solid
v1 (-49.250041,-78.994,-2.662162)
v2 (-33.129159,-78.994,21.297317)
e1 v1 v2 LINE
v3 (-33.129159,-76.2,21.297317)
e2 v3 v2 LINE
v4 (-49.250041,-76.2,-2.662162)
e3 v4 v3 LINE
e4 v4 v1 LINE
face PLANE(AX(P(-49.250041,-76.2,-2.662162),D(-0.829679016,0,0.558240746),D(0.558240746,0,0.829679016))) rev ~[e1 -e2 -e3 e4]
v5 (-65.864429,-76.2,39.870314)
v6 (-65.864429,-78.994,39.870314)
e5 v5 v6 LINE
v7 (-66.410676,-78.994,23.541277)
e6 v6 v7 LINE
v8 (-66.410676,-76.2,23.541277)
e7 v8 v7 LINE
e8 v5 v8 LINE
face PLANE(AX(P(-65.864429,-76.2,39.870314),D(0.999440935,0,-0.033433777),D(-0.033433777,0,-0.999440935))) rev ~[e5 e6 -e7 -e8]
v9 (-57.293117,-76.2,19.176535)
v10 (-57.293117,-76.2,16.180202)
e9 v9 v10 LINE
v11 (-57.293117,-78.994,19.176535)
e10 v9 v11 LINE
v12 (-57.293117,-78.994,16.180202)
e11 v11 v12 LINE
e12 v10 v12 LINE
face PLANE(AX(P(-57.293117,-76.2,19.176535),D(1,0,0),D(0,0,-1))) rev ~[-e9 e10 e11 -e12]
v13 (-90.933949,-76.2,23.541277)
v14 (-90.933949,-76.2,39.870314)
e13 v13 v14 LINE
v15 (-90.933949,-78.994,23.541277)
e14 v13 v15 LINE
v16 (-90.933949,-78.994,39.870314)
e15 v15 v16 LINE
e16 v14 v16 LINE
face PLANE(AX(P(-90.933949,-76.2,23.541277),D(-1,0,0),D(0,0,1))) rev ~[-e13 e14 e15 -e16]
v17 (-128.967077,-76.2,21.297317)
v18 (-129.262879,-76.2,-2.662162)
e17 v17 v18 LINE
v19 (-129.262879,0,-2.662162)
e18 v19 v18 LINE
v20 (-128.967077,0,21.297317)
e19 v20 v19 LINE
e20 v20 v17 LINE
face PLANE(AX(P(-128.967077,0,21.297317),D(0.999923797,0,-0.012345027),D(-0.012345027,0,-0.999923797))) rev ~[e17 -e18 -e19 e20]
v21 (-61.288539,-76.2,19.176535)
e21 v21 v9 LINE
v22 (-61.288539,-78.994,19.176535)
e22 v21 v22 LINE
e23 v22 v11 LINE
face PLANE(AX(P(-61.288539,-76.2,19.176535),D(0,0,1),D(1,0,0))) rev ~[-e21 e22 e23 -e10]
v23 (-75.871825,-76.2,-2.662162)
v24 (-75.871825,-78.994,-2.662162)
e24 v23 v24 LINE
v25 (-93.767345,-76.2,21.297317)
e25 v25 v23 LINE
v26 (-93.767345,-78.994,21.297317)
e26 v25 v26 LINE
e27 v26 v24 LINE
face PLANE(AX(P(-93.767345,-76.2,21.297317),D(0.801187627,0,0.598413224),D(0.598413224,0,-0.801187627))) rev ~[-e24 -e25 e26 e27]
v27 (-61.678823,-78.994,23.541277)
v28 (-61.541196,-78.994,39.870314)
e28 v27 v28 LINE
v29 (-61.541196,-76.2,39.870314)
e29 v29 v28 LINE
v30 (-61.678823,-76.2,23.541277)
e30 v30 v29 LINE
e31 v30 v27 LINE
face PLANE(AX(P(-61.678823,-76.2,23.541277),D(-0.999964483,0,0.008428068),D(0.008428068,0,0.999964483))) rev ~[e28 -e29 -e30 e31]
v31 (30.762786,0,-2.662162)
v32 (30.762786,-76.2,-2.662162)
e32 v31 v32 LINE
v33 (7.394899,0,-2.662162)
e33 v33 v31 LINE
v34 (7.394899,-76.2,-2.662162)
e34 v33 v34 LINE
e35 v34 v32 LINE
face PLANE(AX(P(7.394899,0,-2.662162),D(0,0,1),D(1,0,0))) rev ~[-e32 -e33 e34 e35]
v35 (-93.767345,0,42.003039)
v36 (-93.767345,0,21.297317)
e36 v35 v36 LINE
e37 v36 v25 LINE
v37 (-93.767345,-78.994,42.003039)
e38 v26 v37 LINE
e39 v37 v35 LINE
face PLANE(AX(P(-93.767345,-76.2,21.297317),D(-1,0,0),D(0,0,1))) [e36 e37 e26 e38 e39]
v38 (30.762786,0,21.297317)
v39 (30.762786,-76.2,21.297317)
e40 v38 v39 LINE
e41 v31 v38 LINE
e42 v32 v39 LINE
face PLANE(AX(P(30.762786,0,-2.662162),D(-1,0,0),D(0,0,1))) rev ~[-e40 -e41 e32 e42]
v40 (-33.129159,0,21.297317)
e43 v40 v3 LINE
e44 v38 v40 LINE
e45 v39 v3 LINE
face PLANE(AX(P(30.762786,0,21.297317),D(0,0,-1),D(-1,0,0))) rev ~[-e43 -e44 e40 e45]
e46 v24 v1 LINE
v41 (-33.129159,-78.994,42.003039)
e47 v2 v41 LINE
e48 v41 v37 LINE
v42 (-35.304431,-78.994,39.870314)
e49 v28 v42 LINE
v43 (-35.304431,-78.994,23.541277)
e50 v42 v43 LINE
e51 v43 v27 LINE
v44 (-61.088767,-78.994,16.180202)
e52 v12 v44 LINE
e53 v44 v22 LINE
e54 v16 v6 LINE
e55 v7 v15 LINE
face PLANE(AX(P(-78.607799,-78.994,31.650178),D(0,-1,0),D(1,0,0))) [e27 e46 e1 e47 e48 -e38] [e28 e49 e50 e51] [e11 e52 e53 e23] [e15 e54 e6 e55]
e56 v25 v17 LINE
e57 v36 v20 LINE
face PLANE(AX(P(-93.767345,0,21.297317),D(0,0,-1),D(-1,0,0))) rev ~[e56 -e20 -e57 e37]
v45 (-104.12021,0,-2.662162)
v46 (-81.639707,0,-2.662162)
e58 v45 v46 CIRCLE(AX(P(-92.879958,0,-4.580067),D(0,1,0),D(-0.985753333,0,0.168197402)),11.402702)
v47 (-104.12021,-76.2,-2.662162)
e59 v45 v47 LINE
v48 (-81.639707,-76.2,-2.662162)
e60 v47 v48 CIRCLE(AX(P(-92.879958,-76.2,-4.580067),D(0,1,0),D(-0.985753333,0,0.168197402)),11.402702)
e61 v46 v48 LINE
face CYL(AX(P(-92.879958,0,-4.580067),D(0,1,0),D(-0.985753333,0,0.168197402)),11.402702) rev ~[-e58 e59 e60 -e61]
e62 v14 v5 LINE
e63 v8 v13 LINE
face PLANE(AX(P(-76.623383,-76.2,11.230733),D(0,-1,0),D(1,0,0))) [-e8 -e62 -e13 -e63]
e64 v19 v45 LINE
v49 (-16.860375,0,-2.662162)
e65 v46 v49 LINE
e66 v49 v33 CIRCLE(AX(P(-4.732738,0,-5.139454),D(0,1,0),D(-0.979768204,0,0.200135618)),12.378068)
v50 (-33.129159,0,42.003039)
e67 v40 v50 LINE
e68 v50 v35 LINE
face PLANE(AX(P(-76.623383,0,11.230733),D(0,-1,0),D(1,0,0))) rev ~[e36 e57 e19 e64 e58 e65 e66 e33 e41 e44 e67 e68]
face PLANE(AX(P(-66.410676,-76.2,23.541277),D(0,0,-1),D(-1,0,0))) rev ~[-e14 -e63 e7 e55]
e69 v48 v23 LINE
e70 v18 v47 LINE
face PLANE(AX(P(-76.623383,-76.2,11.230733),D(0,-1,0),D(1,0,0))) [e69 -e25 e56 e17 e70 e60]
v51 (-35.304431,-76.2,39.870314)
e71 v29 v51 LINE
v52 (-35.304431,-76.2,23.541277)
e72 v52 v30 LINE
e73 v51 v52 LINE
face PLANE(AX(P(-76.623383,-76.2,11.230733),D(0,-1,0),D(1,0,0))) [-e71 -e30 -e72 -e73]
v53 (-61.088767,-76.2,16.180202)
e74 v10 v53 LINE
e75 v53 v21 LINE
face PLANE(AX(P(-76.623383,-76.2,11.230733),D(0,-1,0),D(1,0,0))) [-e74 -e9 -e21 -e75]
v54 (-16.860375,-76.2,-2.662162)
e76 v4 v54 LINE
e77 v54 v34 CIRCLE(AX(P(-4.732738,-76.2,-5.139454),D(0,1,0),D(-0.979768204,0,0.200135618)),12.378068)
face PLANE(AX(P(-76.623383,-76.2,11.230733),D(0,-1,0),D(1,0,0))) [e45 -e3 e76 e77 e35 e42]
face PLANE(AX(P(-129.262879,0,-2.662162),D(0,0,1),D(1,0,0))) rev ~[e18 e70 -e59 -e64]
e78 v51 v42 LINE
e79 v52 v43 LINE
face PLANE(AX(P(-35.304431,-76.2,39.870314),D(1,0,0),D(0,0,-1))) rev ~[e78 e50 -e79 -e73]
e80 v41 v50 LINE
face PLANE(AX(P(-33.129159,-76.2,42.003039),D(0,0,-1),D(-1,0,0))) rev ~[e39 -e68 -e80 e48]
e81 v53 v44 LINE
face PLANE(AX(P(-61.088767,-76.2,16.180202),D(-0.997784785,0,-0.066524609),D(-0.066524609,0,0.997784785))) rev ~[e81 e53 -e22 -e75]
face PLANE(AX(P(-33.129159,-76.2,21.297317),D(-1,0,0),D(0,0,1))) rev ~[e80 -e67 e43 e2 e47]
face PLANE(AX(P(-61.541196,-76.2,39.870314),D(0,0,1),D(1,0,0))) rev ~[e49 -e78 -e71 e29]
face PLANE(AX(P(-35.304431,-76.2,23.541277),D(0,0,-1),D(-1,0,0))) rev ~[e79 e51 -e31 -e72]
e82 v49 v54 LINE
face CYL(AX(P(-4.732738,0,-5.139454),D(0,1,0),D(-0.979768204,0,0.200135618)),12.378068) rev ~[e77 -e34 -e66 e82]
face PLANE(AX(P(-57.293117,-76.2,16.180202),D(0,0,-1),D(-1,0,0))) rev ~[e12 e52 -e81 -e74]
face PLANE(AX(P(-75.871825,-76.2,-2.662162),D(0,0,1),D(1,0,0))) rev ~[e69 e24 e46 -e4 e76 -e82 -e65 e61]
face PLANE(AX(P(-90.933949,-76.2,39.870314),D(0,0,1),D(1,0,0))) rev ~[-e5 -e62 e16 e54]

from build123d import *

# Parameters (mm, degrees)
F1_DEPTH = 76.2
F2_W     = 30.3190927953
F2_H     = 20.7057222724
F4_DEPTH = 2.794


# Not quite as in the source:
# - the program builds the solid bodies; features that only make, move or delete a surface that nothing else refers to are left out


with BuildPart() as f1:
    # F0 (on Front) → F1 (new body)
    with BuildSketch(Plane.XZ):
        Polygon((-93.7673449516, 21.5931143612), (-93.7673449516, 21.2973169982), (-93.7673449516, 12.9849165678), (-76.1796534061, -2.6621618308), (-63.4482521564, -2.6621618308), (-63.4482521564, 21.4452156797), align=None)
        Polygon((-63.4482521564, 42.0030392706), (-63.4482521564, 21.4452156797), (-33.1291593611, 21.2973169982), (-33.1291593611, 42.0030392706), align=None)
        Polygon((-93.7673449516, 42.0030392706), (-93.7673449516, 21.5931143612), (-63.4482521564, 21.4452156797), (-63.4482521564, 42.0030392706), align=None)
        with BuildLine():
            Line((30.7627860457, 21.2973169982), (-33.1291593611, 21.2973169982))
            Line((-33.1291593611, 21.2973169982), (-47.1545420587, -2.6621618308))
            Line((-47.1545420587, -2.6621618308), (-16.8603751808, -2.6621618308))
            ThreePointArc((-16.8603751808, -2.6621618308), (-4.7327380162, 7.2386136425), (7.3948991485, -2.6621618308))
            Line((7.3948991485, -2.6621618308), (30.7627860457, -2.6621618308))
            Line((30.7627860457, -2.6621618308), (30.7627860457, 21.2973169982))
        make_face()
        with BuildLine():
            Line((-93.7673449516, 21.2973169982), (-128.96707654, 21.2973169982))
            Line((-128.96707654, 21.2973169982), (-129.2628794909, -2.6621618308))
            Line((-129.2628794909, -2.6621618308), (-104.1202098131, -2.6621618308))
            ThreePointArc((-104.1202098131, -2.6621618308), (-92.8799584508, 6.8226352019), (-81.6397070885, -2.6621618308))
            Line((-81.6397070885, -2.6621618308), (-76.1796534061, -2.6621618308))
            Line((-76.1796534061, -2.6621618308), (-93.7673449516, 12.9849165678))
            Line((-93.7673449516, 12.9849165678), (-93.7673449516, 21.2973169982))
        make_face()
        Polygon((-33.1291593611, 21.2973169982), (-63.4482521564, 21.4452156797), (-63.4482521564, -2.6621618308), (-47.1545420587, -2.6621618308), align=None)
    extrude(amount=F1_DEPTH)

    # F2 (on face) → F4 (join)
    with BuildSketch(Plane.XZ.offset(76.2)):
        with Locations((-78.607798554, 31.6501781344)):
            Rectangle(F2_W, F2_H)
        Polygon((-90.9339487553, 39.8703143001), (-65.8644288778, 39.8703143001), (-66.4106756449, 23.5412772745), (-90.9339487553, 23.5412772745), align=None, mode=Mode.SUBTRACT)
        with Locations((-48.2887057588, 31.6501781344)):
            Rectangle(F2_W, F2_H)
        Polygon((-35.3044308722, 23.5412772745), (-61.6788230836, 23.5412772745), (-61.5411959589, 39.8703143001), (-35.3044308722, 39.8703143001), align=None, mode=Mode.SUBTRACT)
        Polygon((-63.4482521564, 21.2973169982), (-93.7673449516, 21.2973169982), (-75.8718252182, -2.6621618308), (-63.4482521564, -2.6621618308), align=None)
        Polygon((-33.1291593611, 21.2973169982), (-63.4482521564, 21.2973169982), (-63.4482521564, -2.6621618308), (-49.2500411347, -2.6621618308), align=None)
        Polygon((-57.2931170464, 16.1802023649), (-61.0887669027, 16.1802023649), (-61.2885393202, 19.1765353084), (-57.2931170464, 19.1765353084), align=None, mode=Mode.SUBTRACT)
    extrude(amount=F4_DEPTH)


solid = f1.part
